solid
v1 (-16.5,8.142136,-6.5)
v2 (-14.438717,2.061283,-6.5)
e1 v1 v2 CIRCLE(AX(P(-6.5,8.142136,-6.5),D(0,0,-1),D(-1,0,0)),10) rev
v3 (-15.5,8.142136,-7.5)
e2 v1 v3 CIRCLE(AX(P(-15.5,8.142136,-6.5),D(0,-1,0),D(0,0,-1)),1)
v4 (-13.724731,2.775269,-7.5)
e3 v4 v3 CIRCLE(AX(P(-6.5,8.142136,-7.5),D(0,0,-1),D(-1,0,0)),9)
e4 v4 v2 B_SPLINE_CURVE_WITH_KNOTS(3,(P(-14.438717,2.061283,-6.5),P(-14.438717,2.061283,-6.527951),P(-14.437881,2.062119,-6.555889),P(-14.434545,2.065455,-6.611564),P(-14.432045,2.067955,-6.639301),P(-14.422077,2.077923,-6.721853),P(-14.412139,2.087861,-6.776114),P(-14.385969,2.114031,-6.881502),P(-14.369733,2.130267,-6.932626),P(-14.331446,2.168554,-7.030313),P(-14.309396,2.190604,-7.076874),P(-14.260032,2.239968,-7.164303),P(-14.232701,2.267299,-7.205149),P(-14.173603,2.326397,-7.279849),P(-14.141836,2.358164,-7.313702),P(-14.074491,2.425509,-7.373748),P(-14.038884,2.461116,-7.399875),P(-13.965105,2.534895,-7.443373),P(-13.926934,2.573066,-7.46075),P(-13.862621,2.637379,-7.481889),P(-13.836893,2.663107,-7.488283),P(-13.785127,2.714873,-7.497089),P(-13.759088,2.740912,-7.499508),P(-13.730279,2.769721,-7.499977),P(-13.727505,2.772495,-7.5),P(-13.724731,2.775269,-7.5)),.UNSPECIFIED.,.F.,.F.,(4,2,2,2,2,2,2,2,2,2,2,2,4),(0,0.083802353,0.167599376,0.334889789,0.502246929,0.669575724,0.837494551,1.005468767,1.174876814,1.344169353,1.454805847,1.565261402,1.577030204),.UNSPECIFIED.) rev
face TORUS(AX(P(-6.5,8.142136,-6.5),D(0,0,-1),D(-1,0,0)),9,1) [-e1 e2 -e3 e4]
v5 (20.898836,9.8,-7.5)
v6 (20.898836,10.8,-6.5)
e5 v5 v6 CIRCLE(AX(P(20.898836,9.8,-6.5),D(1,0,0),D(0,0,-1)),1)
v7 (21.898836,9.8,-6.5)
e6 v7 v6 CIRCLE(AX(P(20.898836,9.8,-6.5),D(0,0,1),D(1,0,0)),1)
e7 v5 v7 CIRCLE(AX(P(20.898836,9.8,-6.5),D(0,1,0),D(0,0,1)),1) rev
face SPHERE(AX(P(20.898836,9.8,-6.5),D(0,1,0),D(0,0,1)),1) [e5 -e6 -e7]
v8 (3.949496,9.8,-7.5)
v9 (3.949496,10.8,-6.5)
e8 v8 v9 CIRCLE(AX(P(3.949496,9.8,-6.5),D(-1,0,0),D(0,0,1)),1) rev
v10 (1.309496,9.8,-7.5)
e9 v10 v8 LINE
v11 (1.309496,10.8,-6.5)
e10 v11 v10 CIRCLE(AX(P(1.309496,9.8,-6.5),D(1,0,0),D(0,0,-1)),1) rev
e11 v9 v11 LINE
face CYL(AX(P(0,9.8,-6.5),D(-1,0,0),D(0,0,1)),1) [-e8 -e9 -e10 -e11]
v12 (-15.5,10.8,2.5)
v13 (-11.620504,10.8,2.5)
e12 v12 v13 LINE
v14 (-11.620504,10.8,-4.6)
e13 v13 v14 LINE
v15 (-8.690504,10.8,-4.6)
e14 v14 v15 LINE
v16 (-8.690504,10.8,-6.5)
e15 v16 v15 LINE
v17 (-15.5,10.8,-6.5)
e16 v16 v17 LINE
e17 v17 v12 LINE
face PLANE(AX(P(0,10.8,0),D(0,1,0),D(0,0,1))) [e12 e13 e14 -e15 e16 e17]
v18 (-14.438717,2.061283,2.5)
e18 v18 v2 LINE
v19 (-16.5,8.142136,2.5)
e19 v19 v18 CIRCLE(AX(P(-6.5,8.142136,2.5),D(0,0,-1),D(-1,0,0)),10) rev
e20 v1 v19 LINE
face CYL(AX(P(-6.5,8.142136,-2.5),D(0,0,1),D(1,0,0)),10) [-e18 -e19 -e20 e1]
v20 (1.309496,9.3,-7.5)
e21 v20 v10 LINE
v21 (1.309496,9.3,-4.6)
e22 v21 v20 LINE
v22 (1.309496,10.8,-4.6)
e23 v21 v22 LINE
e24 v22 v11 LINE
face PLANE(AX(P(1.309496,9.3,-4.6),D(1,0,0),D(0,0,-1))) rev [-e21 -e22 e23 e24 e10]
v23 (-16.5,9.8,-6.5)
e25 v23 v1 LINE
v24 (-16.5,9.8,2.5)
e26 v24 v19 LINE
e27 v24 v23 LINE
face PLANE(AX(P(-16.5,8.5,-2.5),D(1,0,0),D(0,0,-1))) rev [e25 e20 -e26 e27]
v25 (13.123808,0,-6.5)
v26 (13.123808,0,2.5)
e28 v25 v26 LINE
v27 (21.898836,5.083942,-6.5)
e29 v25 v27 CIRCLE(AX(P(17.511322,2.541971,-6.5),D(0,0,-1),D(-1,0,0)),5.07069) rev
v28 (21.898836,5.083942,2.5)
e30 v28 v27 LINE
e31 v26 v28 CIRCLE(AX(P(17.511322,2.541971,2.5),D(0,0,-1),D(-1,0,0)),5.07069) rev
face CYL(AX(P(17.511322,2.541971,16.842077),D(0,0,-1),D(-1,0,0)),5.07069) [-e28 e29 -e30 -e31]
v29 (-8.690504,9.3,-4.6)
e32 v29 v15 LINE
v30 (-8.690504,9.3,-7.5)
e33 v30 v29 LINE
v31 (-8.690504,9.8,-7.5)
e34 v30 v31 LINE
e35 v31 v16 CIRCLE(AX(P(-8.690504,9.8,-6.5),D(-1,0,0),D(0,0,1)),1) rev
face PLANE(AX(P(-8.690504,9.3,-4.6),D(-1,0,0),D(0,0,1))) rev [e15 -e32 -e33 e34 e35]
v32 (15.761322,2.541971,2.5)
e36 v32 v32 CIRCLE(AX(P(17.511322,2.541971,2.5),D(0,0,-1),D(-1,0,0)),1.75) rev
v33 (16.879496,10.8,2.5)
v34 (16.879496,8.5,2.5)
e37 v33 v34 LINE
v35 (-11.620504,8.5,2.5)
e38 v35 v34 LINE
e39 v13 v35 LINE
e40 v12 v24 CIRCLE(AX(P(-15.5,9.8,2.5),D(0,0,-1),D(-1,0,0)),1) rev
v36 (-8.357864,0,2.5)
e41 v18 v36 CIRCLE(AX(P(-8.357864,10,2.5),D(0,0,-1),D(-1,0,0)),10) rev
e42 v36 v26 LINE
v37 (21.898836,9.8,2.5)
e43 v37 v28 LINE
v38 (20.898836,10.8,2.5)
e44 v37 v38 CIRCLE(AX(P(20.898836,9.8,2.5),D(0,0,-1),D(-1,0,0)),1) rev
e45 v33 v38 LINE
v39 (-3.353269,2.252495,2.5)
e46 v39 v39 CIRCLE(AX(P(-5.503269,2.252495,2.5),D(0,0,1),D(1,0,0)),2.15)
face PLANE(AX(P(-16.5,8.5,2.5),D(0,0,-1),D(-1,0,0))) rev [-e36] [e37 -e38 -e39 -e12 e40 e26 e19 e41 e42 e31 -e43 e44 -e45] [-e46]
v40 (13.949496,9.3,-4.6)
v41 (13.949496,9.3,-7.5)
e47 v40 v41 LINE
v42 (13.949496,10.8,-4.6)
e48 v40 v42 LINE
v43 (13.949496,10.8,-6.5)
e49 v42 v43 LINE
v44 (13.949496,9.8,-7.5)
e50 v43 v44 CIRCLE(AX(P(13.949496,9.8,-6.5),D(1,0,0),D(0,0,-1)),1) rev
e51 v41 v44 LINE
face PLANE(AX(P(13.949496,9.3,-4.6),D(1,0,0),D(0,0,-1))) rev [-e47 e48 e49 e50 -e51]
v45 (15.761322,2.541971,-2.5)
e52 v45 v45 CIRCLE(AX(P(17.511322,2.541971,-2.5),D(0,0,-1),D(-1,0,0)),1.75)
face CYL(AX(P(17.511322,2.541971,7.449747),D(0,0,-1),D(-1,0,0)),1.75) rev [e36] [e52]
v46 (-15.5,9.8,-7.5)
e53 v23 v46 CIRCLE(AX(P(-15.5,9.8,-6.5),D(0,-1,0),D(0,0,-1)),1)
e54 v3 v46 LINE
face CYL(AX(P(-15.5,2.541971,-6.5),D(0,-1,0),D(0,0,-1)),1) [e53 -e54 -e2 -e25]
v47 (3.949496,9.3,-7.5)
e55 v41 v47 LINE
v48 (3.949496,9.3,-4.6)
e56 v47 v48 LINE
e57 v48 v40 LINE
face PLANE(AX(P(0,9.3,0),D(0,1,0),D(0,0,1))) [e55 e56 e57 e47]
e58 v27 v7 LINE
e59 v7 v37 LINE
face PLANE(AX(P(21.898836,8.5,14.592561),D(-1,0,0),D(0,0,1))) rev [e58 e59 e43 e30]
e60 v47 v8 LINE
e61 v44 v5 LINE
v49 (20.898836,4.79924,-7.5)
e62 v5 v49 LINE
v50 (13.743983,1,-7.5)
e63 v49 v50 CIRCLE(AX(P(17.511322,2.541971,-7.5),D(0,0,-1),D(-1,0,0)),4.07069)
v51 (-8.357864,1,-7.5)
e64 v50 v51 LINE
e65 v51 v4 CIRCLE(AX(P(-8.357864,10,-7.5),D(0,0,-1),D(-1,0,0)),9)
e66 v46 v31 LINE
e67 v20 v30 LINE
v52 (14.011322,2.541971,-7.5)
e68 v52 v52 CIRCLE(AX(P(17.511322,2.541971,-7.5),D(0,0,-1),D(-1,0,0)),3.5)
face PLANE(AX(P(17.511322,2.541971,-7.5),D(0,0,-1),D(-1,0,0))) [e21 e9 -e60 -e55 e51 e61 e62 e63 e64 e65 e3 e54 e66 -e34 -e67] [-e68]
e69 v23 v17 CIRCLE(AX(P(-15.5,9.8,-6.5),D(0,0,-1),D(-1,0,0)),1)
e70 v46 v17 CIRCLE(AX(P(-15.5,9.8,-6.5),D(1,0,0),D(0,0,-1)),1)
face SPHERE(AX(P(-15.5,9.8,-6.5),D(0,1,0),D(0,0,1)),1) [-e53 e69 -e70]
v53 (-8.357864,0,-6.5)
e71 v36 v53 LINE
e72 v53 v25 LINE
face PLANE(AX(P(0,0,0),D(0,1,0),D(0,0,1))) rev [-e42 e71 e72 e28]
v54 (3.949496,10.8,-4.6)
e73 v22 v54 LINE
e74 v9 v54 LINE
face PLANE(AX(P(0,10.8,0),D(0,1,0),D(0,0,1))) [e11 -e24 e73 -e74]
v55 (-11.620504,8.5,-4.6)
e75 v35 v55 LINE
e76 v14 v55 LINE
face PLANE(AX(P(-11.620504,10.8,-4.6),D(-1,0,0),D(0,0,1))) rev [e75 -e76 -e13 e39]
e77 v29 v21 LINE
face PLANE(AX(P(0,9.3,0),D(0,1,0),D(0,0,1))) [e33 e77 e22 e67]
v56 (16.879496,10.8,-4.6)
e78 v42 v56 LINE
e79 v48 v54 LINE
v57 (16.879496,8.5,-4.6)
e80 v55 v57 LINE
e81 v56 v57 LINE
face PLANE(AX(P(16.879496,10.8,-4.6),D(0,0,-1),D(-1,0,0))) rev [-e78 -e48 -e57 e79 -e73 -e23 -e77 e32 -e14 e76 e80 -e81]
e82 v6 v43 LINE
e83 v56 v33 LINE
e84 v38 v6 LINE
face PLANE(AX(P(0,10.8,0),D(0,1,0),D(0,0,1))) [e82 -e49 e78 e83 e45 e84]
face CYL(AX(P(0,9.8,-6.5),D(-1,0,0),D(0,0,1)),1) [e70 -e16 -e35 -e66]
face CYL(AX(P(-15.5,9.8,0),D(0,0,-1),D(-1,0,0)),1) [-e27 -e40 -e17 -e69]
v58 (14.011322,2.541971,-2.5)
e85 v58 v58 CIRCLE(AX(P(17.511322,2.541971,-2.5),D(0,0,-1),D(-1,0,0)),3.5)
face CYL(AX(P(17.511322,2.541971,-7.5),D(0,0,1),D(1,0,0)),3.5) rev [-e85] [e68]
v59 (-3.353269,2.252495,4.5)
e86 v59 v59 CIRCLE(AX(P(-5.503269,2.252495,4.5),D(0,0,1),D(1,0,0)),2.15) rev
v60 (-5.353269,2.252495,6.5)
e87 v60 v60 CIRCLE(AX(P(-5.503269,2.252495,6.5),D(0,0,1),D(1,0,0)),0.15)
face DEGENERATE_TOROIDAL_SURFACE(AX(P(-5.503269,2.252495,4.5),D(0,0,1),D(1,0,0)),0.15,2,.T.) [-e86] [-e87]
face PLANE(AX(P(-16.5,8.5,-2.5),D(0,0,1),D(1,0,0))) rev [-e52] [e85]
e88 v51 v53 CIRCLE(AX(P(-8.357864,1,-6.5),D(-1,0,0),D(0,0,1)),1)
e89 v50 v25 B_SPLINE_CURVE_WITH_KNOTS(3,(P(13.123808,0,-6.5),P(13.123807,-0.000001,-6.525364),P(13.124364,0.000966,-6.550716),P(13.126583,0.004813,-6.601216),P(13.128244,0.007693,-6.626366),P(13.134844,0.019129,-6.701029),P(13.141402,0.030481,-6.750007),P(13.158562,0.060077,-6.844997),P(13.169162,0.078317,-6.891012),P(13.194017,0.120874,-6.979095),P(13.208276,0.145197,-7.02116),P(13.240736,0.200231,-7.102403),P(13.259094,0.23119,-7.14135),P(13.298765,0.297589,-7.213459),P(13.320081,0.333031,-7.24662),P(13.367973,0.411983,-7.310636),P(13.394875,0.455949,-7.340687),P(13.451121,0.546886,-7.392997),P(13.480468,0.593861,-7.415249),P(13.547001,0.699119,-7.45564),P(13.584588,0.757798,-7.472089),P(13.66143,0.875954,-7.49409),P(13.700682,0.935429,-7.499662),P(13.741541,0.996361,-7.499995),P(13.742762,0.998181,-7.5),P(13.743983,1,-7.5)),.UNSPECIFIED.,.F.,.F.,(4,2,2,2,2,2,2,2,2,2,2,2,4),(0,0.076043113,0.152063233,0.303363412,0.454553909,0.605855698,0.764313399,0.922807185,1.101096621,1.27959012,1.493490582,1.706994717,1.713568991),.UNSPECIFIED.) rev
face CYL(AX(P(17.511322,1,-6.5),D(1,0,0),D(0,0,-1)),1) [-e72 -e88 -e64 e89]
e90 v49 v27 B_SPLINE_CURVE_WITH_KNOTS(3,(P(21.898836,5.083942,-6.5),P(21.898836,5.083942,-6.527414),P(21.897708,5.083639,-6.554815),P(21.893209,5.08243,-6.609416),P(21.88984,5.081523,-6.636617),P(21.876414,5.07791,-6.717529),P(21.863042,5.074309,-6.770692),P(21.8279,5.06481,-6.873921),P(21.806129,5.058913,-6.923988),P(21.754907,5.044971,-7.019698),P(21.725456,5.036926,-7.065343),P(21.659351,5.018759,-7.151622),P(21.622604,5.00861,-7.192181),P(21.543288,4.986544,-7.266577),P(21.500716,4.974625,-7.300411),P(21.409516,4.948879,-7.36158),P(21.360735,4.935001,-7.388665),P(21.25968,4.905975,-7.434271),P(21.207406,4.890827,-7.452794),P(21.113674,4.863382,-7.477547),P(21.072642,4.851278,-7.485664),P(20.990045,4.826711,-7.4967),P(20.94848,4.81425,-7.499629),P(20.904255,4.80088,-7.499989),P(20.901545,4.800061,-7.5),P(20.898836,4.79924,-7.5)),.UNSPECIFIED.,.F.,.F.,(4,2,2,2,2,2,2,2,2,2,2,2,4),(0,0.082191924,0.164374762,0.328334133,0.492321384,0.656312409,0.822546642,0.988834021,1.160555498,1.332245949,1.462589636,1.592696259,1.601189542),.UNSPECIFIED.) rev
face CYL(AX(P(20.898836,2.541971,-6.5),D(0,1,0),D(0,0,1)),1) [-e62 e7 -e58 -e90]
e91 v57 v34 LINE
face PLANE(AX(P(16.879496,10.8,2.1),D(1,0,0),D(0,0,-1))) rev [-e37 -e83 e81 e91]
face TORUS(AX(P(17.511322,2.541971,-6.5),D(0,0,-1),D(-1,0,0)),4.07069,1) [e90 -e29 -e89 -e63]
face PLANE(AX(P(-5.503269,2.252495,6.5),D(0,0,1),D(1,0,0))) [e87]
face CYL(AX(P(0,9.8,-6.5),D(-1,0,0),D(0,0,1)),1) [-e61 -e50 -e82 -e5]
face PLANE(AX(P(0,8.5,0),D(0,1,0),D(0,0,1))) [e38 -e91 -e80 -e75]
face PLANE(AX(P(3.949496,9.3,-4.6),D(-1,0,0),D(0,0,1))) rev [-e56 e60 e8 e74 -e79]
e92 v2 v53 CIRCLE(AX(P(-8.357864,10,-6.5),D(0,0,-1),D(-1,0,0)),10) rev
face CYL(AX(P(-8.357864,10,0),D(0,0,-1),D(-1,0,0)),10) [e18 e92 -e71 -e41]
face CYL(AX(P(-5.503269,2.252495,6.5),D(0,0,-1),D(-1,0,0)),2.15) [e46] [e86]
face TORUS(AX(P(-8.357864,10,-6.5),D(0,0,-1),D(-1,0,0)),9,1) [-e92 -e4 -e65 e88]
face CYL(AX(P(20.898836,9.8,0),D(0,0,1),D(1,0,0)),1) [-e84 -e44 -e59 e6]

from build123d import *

# Parameters (mm, degrees)
CROQUIS1_W              = 33
CROQUIS1_H              = 5
SALIENTE_EXTRUIR1_DEPTH = 8.5
CROQUIS2_W              = 5
CROQUIS2_H              = 8.5
SALIENTE_EXTRUIR2_DEPTH = 14
CORTAR_EXTRUIR1_REACH   = 34.055
CROQUIS5_R              = 5.070689822
SALIENTE_EXTRUIR3_DEPTH = 5
CROQUIS6_R              = 1.75
CORTAR_EXTRUIR2_DEPTH   = 5
SALIENTE_EXTRUIR4_START = 5
CROQUIS7_R              = 3.5
SALIENTE_EXTRUIR4_DEPTH = 5
SALIENTE_EXTRUIR5_DEPTH = 2.3
CROQUIS9_W              = 10
CROQUIS9_H              = 2.9
CORTAR_EXTRUIR3_DEPTH   = 1.5
CHAFL_N1_SIZE           = 4
REDONDEO1_R             = 10
REDONDEO3_R             = 1
REDONDEO4_R             = 1
REDONDEO5_R             = 1
REDONDEO6_R             = 1
REDONDEO7_R             = 1
CROQUIS10_R             = 2.15
SALIENTE_EXTRUIR6_DEPTH = 4
REDONDEO8_R             = 2


with BuildPart() as part:
    # Croquis1 → Saliente-Extruir1 (new body)
    with BuildSketch(Plane(origin=(0, 0, 0), x_dir=(1, 0, 0), z_dir=(0, 1, 0))):
        Rectangle(CROQUIS1_W, CROQUIS1_H)
    extrude(amount=SALIENTE_EXTRUIR1_DEPTH)

    # Croquis2 → Saliente-Extruir2 (add)
    with BuildSketch(Plane(origin=(16.5, 0, 0), x_dir=(0, 0, -1), z_dir=(1, 0, 0))):
        with Locations((0, 4.25)):
            Rectangle(CROQUIS2_W, CROQUIS2_H)
    extrude(amount=SALIENTE_EXTRUIR2_DEPTH)

    # Croquis4 → Cortar-Extruir1 (cut, up to next)
    with BuildSketch(Plane(origin=(0, 0, -2.5), x_dir=(-1, 0, 0), z_dir=(0, 0, -1)), mode=Mode.PRIVATE) as cortar_extruir1_sk1:
        Polygon((-21.898835729, 8.5), (-21.898835729, 2.753380039), (-21.898835729, 0), (-30.5, 0), (-30.5, 8.5), align=None)
    cortar_extruir1_tool1 = extrude(cortar_extruir1_sk1.sketch, amount=-CORTAR_EXTRUIR1_REACH, mode=Mode.PRIVATE) & part.part
    add(cortar_extruir1_tool1.solids().sort_by_distance((26.199418, 4.25, -2.5))[0], mode=Mode.SUBTRACT)

    # Croquis5 → Saliente-Extruir3 (add)
    with BuildSketch(Plane(origin=(0, 0, -2.5), x_dir=(-1, 0, 0), z_dir=(0, 0, -1))):
        with Locations((-17.511321809, 2.541971061)):
            Circle(CROQUIS5_R)
    extrude(amount=-SALIENTE_EXTRUIR3_DEPTH)

    # Croquis6 → Cortar-Extruir2 (cut)
    with BuildSketch(Plane(origin=(0, 0, -2.5), x_dir=(-1, 0, 0), z_dir=(0, 0, -1))):
        with Locations((-17.511321809, 2.541971061)):
            Circle(CROQUIS6_R)
    extrude(amount=-CORTAR_EXTRUIR2_DEPTH, mode=Mode.SUBTRACT)

    # Croquis7 → Saliente-Extruir4 (add)
    with BuildSketch(Plane(origin=(0, 0, -2.5), x_dir=(-1, 0, 0), z_dir=(0, 0, -1)).offset(SALIENTE_EXTRUIR4_START)):
        with BuildLine():
            Line((-21.898835729, 8.5), (-21.898835729, 5.083942123))
            ThreePointArc((-21.898835729, 5.083942123), (-20.05329287, -1.845542858), (-13.123807889, 0))
            Line((-13.123807889, 0), (16.5, 0))
            Line((16.5, 0), (16.5, 8.5))
            Line((16.5, 8.5), (-21.898835729, 8.5))
        make_face()
        with Locations((-17.511321809, 2.541971061)):
            Circle(CROQUIS7_R, mode=Mode.SUBTRACT)
    extrude(amount=-SALIENTE_EXTRUIR4_DEPTH)

    # Croquis8 → Saliente-Extruir5 (add)
    with BuildSketch(Plane(origin=(0, 8.5, 0), x_dir=(1, 0, 0), z_dir=(0, 1, 0))):
        Polygon((-16.5, -2.5), (-11.620504371, -2.5), (-11.620504371, -2.1), (-11.620504371, 4.6), (16.879495629, 4.6), (16.879495629, -2.1), (16.879495629, -2.5), (21.898835729, -2.5), (21.898835729, 7.5), (-16.5, 7.5), align=None)
    extrude(amount=SALIENTE_EXTRUIR5_DEPTH)

    # Croquis9 → Cortar-Extruir3 (cut)
    with BuildSketch(Plane(origin=(0, 10.8, 0), x_dir=(1, 0, 0), z_dir=(0, 1, 0))):
        with Locations((8.949495629, 6.05)):
            Rectangle(CROQUIS9_W, CROQUIS9_H)
        with Locations((-3.690504371, 6.05)):
            Rectangle(CROQUIS9_W, CROQUIS9_H)
    extrude(amount=-CORTAR_EXTRUIR3_DEPTH, mode=Mode.SUBTRACT)

    # Chaflán1
    chafl_n1_edges = [part.edges().sort_by_distance(p)[0] for p in [
        (-16.5, 0, -2.5),
    ]]
    chamfer(chafl_n1_edges, length=CHAFL_N1_SIZE)

    # Redondeo1
    # the kernel refuses this fillet: 10 mm, written as the material it takes off along each edge
    with BuildSketch(Plane(origin=(-12.5, 0, 12.855339059), x_dir=(-0.7071067811865476, 0.7071067811865477, 0), z_dir=(0, 0, -1)), Plane(origin=(-16.5, 4, 12.855339059), x_dir=(0, 1, 0), z_dir=(0, 0, -1))) as redondeo1_piece_1:
        with BuildLine():
            CenterArc((REDONDEO1_R * 0.414213562373, REDONDEO1_R), REDONDEO1_R, 225, 45)
            Line((-REDONDEO1_R * 0.292893218813, REDONDEO1_R * 0.292893218813), (0, 0))
            Line((0, 0), (REDONDEO1_R * 0.414213562373, 0))
        make_face()
    extrude(amount=30.710678119, mode=Mode.SUBTRACT)

    # Redondeo3
    redondeo3_edges = [part.edges().sort_by_distance(p)[0] for p in [
        (-16.5, 9.471067812, -7.5),
        (-15.970669758, 4.931775157, -7.5),
        (-11.568224843, 0.529330242, -7.5),
        (2.382971757, 0, -7.5),
    ]]
    fillet(redondeo3_edges, radius=REDONDEO3_R)

    # Redondeo4
    redondeo4_edges = [part.edges().sort_by_distance(p)[0] for p in [
        (19.565273177, -2.094102606, -7.5),
        (21.898835729, 7.941971061, -7.5),
    ]]
    fillet(redondeo4_edges, radius=REDONDEO4_R)

    # Redondeo5
    redondeo5_edges = [part.edges().sort_by_distance(p)[0] for p in [
        (17.424165679, 10.8, -7.5),
        (21.60594251, 10.8, -7.207106781),
        (21.898835729, 10.8, -2),
    ]]
    fillet(redondeo5_edges, radius=REDONDEO5_R)

    # Redondeo6
    redondeo6_edges = [part.edges().sort_by_distance(p)[0] for p in [
        (-12.095252185, 10.8, -7.5),
        (-16.5, 10.8, -2),
        (-16.207106781, 10.8, -7.207106781),
    ]]
    fillet(redondeo6_edges, radius=REDONDEO6_R)

    # Redondeo7
    redondeo7_edges = [part.edges().sort_by_distance(p)[0] for p in [
        (2.629495629, 10.8, -7.5),
    ]]
    fillet(redondeo7_edges, radius=REDONDEO7_R)

    # Croquis10 → Saliente-Extruir6 (add)
    with BuildSketch(Plane.XY.offset(2.5)):
        with Locations((-5.503268941, 2.252495098)):
            Circle(CROQUIS10_R)
    extrude(amount=SALIENTE_EXTRUIR6_DEPTH)

    # Redondeo8
    redondeo8_edges = [part.edges().sort_by_distance(p)[0] for p in [
        (-7.653268941, 2.252495098, 6.5),
    ]]
    fillet(redondeo8_edges, radius=REDONDEO8_R)


solid = part.part
